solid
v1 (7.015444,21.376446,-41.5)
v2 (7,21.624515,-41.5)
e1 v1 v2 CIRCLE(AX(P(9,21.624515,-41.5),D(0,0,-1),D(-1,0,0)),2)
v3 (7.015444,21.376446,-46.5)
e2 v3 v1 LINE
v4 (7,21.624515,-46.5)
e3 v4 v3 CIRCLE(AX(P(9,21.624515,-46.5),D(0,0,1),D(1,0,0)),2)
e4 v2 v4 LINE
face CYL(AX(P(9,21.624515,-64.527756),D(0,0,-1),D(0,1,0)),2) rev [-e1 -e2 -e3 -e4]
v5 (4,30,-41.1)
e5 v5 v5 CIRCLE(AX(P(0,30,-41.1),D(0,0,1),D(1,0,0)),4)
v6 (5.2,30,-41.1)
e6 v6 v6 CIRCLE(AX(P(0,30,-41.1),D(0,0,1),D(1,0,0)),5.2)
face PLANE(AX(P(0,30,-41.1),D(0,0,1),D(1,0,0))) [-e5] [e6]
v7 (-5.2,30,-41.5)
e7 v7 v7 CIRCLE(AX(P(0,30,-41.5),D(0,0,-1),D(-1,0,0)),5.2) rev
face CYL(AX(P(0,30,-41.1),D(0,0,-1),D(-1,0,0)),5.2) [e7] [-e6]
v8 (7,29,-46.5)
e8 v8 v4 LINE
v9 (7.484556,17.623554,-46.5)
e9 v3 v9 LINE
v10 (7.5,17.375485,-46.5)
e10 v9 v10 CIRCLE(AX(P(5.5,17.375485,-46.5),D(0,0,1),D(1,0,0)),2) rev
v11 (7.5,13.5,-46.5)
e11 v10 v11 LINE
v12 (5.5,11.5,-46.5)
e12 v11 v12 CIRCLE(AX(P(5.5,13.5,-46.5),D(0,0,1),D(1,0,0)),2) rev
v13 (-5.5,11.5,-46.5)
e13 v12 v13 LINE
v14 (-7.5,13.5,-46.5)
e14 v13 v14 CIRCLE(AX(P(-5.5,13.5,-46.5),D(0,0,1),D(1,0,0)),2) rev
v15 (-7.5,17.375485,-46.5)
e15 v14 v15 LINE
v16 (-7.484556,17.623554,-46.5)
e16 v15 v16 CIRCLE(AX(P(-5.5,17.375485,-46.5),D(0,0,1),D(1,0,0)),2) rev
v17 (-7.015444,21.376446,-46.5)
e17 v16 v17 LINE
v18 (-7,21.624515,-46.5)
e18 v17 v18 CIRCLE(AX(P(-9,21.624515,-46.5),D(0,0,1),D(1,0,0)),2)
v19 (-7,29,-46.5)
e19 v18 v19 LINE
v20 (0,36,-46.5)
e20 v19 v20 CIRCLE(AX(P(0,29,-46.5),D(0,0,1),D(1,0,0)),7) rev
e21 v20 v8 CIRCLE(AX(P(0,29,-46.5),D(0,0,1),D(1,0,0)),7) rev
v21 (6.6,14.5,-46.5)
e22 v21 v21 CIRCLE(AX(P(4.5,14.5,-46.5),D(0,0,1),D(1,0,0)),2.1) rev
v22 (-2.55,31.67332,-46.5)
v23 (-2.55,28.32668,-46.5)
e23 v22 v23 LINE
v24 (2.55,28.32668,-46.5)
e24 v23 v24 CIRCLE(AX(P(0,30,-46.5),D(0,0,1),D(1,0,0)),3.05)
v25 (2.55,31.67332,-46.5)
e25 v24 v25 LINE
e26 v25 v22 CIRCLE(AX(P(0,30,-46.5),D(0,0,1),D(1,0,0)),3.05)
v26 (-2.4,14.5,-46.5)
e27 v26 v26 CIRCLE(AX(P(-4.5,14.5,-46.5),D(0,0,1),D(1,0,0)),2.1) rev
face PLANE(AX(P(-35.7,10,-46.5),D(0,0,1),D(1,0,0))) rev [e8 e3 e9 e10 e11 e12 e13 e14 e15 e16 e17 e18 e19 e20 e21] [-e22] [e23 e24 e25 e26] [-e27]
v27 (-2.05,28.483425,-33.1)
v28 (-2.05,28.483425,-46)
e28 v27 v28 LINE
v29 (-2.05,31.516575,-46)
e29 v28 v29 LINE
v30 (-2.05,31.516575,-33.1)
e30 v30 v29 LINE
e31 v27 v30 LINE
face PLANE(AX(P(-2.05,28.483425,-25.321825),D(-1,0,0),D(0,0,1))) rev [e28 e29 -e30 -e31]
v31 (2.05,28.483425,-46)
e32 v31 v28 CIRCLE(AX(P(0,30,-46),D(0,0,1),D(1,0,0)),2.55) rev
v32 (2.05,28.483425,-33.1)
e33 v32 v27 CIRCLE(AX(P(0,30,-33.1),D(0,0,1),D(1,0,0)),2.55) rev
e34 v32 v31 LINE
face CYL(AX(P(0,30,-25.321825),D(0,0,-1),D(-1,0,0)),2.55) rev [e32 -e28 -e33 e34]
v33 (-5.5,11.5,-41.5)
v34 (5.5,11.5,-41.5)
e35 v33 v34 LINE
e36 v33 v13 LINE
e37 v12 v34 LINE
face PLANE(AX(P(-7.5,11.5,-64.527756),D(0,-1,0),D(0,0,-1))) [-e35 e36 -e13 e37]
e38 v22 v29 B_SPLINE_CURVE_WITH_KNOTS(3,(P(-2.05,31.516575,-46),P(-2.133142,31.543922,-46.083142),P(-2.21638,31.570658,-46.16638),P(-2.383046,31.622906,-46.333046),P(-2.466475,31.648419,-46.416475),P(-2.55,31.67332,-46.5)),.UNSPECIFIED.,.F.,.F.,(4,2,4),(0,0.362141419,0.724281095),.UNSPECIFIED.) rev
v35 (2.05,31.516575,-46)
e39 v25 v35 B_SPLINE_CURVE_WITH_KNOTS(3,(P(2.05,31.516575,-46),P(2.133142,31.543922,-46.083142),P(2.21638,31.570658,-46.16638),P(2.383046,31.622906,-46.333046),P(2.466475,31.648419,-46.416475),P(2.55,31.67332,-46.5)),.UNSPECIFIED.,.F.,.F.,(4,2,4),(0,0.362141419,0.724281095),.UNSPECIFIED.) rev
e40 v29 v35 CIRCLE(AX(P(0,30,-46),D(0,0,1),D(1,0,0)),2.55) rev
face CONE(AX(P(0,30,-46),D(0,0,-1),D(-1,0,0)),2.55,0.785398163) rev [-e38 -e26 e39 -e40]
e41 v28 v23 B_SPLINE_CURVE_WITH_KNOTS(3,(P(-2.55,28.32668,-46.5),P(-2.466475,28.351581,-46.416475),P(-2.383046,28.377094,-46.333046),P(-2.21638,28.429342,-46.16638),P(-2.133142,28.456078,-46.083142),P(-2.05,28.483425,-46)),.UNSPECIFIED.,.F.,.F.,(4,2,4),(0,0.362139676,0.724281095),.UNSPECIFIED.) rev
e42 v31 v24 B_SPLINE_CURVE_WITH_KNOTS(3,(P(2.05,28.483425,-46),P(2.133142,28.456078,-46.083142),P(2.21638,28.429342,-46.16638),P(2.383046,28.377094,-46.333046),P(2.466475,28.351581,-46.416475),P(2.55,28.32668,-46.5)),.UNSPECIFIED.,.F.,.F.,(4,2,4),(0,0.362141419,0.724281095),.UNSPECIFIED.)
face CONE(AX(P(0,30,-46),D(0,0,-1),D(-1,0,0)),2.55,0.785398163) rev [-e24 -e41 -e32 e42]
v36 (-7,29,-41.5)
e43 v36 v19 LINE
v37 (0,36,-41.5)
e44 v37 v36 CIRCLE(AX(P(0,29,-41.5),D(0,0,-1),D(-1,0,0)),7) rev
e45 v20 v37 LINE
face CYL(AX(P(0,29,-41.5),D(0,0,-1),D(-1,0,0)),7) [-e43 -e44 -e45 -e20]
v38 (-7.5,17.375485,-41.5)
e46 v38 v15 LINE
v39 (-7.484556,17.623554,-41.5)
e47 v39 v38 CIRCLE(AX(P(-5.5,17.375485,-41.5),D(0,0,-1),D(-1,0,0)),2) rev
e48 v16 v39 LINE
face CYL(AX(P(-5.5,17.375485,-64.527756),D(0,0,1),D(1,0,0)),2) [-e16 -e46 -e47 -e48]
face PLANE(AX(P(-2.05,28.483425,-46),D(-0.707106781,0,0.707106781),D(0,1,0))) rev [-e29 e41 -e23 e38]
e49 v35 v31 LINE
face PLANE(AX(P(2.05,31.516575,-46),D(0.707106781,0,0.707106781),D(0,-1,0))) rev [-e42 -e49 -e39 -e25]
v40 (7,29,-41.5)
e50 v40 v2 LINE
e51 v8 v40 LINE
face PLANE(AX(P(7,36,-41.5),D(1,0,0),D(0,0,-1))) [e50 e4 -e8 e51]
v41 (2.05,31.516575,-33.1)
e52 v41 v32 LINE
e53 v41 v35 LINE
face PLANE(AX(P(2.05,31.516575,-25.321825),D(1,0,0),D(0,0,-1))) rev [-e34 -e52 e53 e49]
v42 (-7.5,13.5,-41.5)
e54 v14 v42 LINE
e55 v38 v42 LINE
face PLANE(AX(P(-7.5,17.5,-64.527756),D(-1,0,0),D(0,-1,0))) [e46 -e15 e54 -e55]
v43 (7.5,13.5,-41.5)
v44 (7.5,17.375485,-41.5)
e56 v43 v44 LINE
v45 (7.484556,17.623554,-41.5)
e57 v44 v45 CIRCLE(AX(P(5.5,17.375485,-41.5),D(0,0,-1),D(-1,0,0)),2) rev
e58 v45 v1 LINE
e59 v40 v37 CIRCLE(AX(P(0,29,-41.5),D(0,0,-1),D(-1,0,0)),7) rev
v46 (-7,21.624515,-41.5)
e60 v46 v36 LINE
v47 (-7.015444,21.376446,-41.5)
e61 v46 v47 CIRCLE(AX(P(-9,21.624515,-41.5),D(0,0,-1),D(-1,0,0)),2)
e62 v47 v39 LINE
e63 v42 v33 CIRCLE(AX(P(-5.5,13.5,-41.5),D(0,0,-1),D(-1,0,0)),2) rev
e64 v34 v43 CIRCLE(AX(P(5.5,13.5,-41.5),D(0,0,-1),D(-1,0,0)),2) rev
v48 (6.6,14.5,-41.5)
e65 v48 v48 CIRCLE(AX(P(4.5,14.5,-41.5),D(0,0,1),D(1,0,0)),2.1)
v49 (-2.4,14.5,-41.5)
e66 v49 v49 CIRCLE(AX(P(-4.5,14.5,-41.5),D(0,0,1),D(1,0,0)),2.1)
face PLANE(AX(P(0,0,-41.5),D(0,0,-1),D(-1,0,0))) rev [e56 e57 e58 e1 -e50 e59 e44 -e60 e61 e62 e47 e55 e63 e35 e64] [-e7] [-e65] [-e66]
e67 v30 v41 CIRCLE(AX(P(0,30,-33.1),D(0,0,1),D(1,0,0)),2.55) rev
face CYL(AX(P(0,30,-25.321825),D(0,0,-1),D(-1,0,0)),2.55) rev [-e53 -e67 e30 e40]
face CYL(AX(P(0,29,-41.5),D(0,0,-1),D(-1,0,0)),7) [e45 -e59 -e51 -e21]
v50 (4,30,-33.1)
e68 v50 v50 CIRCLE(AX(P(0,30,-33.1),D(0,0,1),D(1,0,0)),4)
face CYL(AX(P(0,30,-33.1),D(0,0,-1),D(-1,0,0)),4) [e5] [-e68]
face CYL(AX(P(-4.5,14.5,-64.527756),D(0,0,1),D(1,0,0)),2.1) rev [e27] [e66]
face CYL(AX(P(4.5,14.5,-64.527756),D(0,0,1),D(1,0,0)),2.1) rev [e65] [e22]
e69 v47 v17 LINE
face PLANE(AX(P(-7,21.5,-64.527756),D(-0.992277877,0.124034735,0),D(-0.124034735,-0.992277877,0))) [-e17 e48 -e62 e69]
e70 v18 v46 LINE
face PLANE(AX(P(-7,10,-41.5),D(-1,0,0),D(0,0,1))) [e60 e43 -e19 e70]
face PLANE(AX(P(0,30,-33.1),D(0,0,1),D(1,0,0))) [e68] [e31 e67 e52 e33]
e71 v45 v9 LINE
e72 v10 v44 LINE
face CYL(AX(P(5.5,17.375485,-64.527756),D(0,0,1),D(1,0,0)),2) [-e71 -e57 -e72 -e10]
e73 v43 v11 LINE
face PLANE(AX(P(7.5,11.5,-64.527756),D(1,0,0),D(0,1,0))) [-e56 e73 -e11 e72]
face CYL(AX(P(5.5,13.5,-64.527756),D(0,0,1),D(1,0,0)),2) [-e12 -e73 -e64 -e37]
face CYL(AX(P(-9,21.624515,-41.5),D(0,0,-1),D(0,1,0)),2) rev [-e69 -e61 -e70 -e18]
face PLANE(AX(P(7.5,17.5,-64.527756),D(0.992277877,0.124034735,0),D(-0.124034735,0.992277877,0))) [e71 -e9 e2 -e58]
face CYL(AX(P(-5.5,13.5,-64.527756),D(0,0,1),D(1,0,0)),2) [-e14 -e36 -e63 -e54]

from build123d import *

# Parameters (mm, degrees)
SKETCH2_W           = 71.4
SKETCH2_H           = 93
SKETCH2_W_2         = 51.4
SKETCH2_H_2         = 73
BOSS_EXTRUDE1_DEPTH = 10
SKETCH3_W           = 14
SKETCH3_H           = 26
SKETCH3_R           = 2.75
BOSS_EXTRUDE2_DEPTH = 5
SKETCH4_R           = 4
SKETCH4_R_2         = 2.75
BOSS_EXTRUDE3_DEPTH = 8.4
SKETCH5_W           = 51.4
SKETCH5_H           = 10
CUT_EXTRUDE1_DEPTH  = 65.130647899
SKETCH6_R           = 5.2
SKETCH6_R_2         = 4
BOSS_EXTRUDE4_DEPTH = 0.4
SKETCH7_W           = 71.4
SKETCH7_H           = 25
CUT_EXTRUDE2_DEPTH  = 65.130647899
FILLET1_START       = -46.5
FILLET1_DEPTH       = 5
FILLET1_2_DEPTH     = 5
SKETCH10_W          = 71.4
SKETCH10_H          = 58
CUT_EXTRUDE3_DEPTH  = 65.130647899
SKETCH9_R           = 2.55
CUT_EXTRUDE4_DEPTH  = 53.440919138
FILLET2_R           = 5
SKETCH11_R          = 2.75
BOSS_EXTRUDE5_DEPTH = 13.4
CHAMFER1_SIZE       = 0.5
CUT_EXTRUDE5_DEPTH  = 52.676783956
SKETCH14_R          = 2.1
BOSS_EXTRUDE6_DEPTH = 5
FILLET3_R           = 2


with BuildPart() as part:
    # Sketch2 → Boss-Extrude1 (new body)
    with BuildSketch(Plane(origin=(0, 0, 0), x_dir=(1, 0, 0), z_dir=(0, 1, 0))):
        Rectangle(SKETCH2_W, SKETCH2_H)
        Rectangle(SKETCH2_W_2, SKETCH2_H_2, mode=Mode.SUBTRACT)
    extrude(amount=BOSS_EXTRUDE1_DEPTH)

    # Sketch3 → Boss-Extrude2 (add)
    with BuildSketch(Plane(origin=(0, 0, -46.5), x_dir=(-1, 0, 0), z_dir=(0, 0, -1))):
        with Locations((0, 23)):
            Rectangle(SKETCH3_W, SKETCH3_H)
        with Locations((0, 30)):
            Circle(SKETCH3_R, mode=Mode.SUBTRACT)
    extrude(amount=-BOSS_EXTRUDE2_DEPTH)

    # Sketch4 → Boss-Extrude3 (add)
    with BuildSketch(Plane.XY.offset(-41.5)):
        with Locations(Location((0, 30, 0), (0, 0, 180))):
            Circle(SKETCH4_R)
        with Locations(Location((0, 30, 0), (0, 0, 180))):
            Circle(SKETCH4_R_2, mode=Mode.SUBTRACT)
    extrude(amount=BOSS_EXTRUDE3_DEPTH)

    # Sketch5 → Cut-Extrude1 (cut, through all)
    with BuildSketch(Plane(origin=(0, 10, 0), x_dir=(1, 0, 0), z_dir=(0, 1, 0))):
        with Locations((0, -41.5)):
            Rectangle(SKETCH5_W, SKETCH5_H)
    extrude(amount=-CUT_EXTRUDE1_DEPTH, mode=Mode.SUBTRACT)

    # Sketch6 → Boss-Extrude4 (add)
    with BuildSketch(Plane.XY.offset(-41.5)):
        with Locations(Location((0, 30, 0), (0, 0, 180))):
            Circle(SKETCH6_R)
        with Locations((0, 30)):
            Circle(SKETCH6_R_2, mode=Mode.SUBTRACT)
    extrude(amount=BOSS_EXTRUDE4_DEPTH)

    # Sketch7 → Cut-Extrude2 (cut, through all)
    with BuildSketch(Plane(origin=(0, 10, 0), x_dir=(1, 0, 0), z_dir=(0, 1, 0))):
        with Locations((0, -34)):
            Rectangle(SKETCH7_W, SKETCH7_H)
    extrude(amount=-CUT_EXTRUDE2_DEPTH, mode=Mode.SUBTRACT)

    # Fillet1: read off the stored shape, not the designer's step
    # Fillet1 outline → Fillet1 (cut)
    with BuildSketch(Plane.XY.offset(FILLET1_START)):
        with BuildLine():
            ThreePointArc((0, 36), (4.949747468, 33.949747468), (7, 29))
            Line((7, 29), (7, 36))
            Line((7, 36), (0, 36))
        make_face()
        with BuildLine():
            ThreePointArc((-7, 29), (-4.949747468, 33.949747468), (0, 36))
            Line((0, 36), (-7, 36))
            Line((-7, 36), (-7, 29))
        make_face()
    extrude(amount=FILLET1_DEPTH, mode=Mode.SUBTRACT)

    # Fillet1 2 outline → Fillet1 2 (add)
    with BuildSketch(Plane.XY.offset(FILLET1_START)):
        with BuildLine():
            ThreePointArc((14, 10), (9.050252532, 12.050252532), (7, 17))
            Line((7, 17), (7, 10))
            Line((7, 10), (14, 10))
        make_face()
        with BuildLine():
            Line((-14, 10), (-7, 10))
            Line((-7, 10), (-7, 17))
            ThreePointArc((-7, 17), (-9.050252532, 12.050252532), (-14, 10))
        make_face()
    extrude(amount=FILLET1_2_DEPTH)

    # Sketch10 → Cut-Extrude3 (cut, through all)
    with BuildSketch(Plane(origin=(0, 10, 0), x_dir=(1, 0, 0), z_dir=(0, 1, 0))):
        with Locations((0, 7.5)):
            Rectangle(SKETCH10_W, SKETCH10_H)
    extrude(amount=-CUT_EXTRUDE3_DEPTH, mode=Mode.SUBTRACT)

    # Sketch9 → Cut-Extrude4 (cut, through all)
    with BuildSketch(Plane(origin=(0, 0, -46.5), x_dir=(-1, 0, 0), z_dir=(0, 0, -1))):
        with Locations((-28.2, 5)):
            Circle(SKETCH9_R)
        with Locations((28.2, 5)):
            Circle(SKETCH9_R)
    extrude(amount=-CUT_EXTRUDE4_DEPTH, mode=Mode.SUBTRACT)

    # Fillet2
    fillet2_edges = [part.edges().sort_by_distance(p)[0] for p in [
        (-35.7, 10, -41.5),
        (-35.7, 0, -41.5),
        (35.7, 0, -41.5),
        (35.7, 10, -41.5),
    ]]
    fillet(fillet2_edges, radius=FILLET2_R - 0.0001)  # a hair under: the kernel refuses the full size

    # Sketch11 → Boss-Extrude5 (add)
    with BuildSketch(Plane(origin=(0, 0, -46.5), x_dir=(-1, 0, 0), z_dir=(0, 0, -1))):
        with Locations((0, 30)):
            Circle(SKETCH11_R)
        with BuildLine():
            Line((-2.05, 31.516575089), (-2.05, 28.483424911))
            ThreePointArc((-2.05, 28.483424911), (0, 27.45), (2.05, 28.483424911))
            Line((2.05, 28.483424911), (2.05, 31.516575089))
            ThreePointArc((2.05, 31.516575089), (0, 32.55), (-2.05, 31.516575089))
        make_face(mode=Mode.SUBTRACT)
    extrude(amount=-BOSS_EXTRUDE5_DEPTH)

    # Chamfer1
    chamfer1_edges = [part.edges().sort_by_distance(p)[0] for p in [
        (0, 32.55, -46.5),
        (-2.05, 30, -46.5),
        (0, 27.45, -46.5),
        (2.05, 30, -46.5),
    ]]
    chamfer(chamfer1_edges, length=CHAMFER1_SIZE)

    # Sketch12 → Cut-Extrude5 (cut, through all)
    with BuildSketch(Plane.XY.offset(-36.5)):
        with BuildLine():
            Line((-7, 17), (7, 17))
            ThreePointArc((7, 17), (9.050252532, 12.050252532), (14, 10))
            Line((14, 10), (30.7, 10))
            ThreePointArc((30.7, 10), (34.235533906, 8.535533906), (35.7, 5))
            ThreePointArc((35.7, 5), (34.235533906, 1.464466094), (30.7, 0))
            Line((30.7, 0), (-30.7, 0))
            ThreePointArc((-30.7, 0), (-34.235533906, 1.464466094), (-35.7, 5))
            ThreePointArc((-35.7, 5), (-34.235533906, 8.535533906), (-30.7, 10))
            Line((-30.7, 10), (-14, 10))
            ThreePointArc((-14, 10), (-9.050252532, 12.050252532), (-7, 17))
        make_face()
    extrude(amount=-CUT_EXTRUDE5_DEPTH, mode=Mode.SUBTRACT)


with BuildPart() as cut_extrude5_kept_piece:
    # of the separate pieces the step leaves, the one the design keeps (cut_extrude5_pieces_kept)
    add(part.part.solids().sort_by_distance((7, 17, -46.5))[0])

    # Sketch14 → Boss-Extrude6 (add)
    with BuildSketch(Plane.XY.offset(-41.5)):
        Polygon((-7, 21.5), (-7.5, 17.5), (-7.5, 11.5), (7.5, 11.5), (7.5, 17.5), (7, 21.5), (7, 17), (-7, 17), align=None)
        with Locations((-4.5, 14.5)):
            Circle(SKETCH14_R, mode=Mode.SUBTRACT)
        with Locations((4.5, 14.5)):
            Circle(SKETCH14_R, mode=Mode.SUBTRACT)
    extrude(amount=-BOSS_EXTRUDE6_DEPTH)

    # Fillet3
    fillet3_edges = [cut_extrude5_kept_piece.edges().sort_by_distance(p)[0] for p in [
        (-7.5, 17.5, -44),
        (-7.5, 11.5, -44),
        (7.5, 11.5, -44),
        (7.5, 17.5, -44),
        (7, 21.5, -44),
        (-7, 21.5, -44),
    ]]
    fillet(fillet3_edges, radius=FILLET3_R)


solid = cut_extrude5_kept_piece.part
